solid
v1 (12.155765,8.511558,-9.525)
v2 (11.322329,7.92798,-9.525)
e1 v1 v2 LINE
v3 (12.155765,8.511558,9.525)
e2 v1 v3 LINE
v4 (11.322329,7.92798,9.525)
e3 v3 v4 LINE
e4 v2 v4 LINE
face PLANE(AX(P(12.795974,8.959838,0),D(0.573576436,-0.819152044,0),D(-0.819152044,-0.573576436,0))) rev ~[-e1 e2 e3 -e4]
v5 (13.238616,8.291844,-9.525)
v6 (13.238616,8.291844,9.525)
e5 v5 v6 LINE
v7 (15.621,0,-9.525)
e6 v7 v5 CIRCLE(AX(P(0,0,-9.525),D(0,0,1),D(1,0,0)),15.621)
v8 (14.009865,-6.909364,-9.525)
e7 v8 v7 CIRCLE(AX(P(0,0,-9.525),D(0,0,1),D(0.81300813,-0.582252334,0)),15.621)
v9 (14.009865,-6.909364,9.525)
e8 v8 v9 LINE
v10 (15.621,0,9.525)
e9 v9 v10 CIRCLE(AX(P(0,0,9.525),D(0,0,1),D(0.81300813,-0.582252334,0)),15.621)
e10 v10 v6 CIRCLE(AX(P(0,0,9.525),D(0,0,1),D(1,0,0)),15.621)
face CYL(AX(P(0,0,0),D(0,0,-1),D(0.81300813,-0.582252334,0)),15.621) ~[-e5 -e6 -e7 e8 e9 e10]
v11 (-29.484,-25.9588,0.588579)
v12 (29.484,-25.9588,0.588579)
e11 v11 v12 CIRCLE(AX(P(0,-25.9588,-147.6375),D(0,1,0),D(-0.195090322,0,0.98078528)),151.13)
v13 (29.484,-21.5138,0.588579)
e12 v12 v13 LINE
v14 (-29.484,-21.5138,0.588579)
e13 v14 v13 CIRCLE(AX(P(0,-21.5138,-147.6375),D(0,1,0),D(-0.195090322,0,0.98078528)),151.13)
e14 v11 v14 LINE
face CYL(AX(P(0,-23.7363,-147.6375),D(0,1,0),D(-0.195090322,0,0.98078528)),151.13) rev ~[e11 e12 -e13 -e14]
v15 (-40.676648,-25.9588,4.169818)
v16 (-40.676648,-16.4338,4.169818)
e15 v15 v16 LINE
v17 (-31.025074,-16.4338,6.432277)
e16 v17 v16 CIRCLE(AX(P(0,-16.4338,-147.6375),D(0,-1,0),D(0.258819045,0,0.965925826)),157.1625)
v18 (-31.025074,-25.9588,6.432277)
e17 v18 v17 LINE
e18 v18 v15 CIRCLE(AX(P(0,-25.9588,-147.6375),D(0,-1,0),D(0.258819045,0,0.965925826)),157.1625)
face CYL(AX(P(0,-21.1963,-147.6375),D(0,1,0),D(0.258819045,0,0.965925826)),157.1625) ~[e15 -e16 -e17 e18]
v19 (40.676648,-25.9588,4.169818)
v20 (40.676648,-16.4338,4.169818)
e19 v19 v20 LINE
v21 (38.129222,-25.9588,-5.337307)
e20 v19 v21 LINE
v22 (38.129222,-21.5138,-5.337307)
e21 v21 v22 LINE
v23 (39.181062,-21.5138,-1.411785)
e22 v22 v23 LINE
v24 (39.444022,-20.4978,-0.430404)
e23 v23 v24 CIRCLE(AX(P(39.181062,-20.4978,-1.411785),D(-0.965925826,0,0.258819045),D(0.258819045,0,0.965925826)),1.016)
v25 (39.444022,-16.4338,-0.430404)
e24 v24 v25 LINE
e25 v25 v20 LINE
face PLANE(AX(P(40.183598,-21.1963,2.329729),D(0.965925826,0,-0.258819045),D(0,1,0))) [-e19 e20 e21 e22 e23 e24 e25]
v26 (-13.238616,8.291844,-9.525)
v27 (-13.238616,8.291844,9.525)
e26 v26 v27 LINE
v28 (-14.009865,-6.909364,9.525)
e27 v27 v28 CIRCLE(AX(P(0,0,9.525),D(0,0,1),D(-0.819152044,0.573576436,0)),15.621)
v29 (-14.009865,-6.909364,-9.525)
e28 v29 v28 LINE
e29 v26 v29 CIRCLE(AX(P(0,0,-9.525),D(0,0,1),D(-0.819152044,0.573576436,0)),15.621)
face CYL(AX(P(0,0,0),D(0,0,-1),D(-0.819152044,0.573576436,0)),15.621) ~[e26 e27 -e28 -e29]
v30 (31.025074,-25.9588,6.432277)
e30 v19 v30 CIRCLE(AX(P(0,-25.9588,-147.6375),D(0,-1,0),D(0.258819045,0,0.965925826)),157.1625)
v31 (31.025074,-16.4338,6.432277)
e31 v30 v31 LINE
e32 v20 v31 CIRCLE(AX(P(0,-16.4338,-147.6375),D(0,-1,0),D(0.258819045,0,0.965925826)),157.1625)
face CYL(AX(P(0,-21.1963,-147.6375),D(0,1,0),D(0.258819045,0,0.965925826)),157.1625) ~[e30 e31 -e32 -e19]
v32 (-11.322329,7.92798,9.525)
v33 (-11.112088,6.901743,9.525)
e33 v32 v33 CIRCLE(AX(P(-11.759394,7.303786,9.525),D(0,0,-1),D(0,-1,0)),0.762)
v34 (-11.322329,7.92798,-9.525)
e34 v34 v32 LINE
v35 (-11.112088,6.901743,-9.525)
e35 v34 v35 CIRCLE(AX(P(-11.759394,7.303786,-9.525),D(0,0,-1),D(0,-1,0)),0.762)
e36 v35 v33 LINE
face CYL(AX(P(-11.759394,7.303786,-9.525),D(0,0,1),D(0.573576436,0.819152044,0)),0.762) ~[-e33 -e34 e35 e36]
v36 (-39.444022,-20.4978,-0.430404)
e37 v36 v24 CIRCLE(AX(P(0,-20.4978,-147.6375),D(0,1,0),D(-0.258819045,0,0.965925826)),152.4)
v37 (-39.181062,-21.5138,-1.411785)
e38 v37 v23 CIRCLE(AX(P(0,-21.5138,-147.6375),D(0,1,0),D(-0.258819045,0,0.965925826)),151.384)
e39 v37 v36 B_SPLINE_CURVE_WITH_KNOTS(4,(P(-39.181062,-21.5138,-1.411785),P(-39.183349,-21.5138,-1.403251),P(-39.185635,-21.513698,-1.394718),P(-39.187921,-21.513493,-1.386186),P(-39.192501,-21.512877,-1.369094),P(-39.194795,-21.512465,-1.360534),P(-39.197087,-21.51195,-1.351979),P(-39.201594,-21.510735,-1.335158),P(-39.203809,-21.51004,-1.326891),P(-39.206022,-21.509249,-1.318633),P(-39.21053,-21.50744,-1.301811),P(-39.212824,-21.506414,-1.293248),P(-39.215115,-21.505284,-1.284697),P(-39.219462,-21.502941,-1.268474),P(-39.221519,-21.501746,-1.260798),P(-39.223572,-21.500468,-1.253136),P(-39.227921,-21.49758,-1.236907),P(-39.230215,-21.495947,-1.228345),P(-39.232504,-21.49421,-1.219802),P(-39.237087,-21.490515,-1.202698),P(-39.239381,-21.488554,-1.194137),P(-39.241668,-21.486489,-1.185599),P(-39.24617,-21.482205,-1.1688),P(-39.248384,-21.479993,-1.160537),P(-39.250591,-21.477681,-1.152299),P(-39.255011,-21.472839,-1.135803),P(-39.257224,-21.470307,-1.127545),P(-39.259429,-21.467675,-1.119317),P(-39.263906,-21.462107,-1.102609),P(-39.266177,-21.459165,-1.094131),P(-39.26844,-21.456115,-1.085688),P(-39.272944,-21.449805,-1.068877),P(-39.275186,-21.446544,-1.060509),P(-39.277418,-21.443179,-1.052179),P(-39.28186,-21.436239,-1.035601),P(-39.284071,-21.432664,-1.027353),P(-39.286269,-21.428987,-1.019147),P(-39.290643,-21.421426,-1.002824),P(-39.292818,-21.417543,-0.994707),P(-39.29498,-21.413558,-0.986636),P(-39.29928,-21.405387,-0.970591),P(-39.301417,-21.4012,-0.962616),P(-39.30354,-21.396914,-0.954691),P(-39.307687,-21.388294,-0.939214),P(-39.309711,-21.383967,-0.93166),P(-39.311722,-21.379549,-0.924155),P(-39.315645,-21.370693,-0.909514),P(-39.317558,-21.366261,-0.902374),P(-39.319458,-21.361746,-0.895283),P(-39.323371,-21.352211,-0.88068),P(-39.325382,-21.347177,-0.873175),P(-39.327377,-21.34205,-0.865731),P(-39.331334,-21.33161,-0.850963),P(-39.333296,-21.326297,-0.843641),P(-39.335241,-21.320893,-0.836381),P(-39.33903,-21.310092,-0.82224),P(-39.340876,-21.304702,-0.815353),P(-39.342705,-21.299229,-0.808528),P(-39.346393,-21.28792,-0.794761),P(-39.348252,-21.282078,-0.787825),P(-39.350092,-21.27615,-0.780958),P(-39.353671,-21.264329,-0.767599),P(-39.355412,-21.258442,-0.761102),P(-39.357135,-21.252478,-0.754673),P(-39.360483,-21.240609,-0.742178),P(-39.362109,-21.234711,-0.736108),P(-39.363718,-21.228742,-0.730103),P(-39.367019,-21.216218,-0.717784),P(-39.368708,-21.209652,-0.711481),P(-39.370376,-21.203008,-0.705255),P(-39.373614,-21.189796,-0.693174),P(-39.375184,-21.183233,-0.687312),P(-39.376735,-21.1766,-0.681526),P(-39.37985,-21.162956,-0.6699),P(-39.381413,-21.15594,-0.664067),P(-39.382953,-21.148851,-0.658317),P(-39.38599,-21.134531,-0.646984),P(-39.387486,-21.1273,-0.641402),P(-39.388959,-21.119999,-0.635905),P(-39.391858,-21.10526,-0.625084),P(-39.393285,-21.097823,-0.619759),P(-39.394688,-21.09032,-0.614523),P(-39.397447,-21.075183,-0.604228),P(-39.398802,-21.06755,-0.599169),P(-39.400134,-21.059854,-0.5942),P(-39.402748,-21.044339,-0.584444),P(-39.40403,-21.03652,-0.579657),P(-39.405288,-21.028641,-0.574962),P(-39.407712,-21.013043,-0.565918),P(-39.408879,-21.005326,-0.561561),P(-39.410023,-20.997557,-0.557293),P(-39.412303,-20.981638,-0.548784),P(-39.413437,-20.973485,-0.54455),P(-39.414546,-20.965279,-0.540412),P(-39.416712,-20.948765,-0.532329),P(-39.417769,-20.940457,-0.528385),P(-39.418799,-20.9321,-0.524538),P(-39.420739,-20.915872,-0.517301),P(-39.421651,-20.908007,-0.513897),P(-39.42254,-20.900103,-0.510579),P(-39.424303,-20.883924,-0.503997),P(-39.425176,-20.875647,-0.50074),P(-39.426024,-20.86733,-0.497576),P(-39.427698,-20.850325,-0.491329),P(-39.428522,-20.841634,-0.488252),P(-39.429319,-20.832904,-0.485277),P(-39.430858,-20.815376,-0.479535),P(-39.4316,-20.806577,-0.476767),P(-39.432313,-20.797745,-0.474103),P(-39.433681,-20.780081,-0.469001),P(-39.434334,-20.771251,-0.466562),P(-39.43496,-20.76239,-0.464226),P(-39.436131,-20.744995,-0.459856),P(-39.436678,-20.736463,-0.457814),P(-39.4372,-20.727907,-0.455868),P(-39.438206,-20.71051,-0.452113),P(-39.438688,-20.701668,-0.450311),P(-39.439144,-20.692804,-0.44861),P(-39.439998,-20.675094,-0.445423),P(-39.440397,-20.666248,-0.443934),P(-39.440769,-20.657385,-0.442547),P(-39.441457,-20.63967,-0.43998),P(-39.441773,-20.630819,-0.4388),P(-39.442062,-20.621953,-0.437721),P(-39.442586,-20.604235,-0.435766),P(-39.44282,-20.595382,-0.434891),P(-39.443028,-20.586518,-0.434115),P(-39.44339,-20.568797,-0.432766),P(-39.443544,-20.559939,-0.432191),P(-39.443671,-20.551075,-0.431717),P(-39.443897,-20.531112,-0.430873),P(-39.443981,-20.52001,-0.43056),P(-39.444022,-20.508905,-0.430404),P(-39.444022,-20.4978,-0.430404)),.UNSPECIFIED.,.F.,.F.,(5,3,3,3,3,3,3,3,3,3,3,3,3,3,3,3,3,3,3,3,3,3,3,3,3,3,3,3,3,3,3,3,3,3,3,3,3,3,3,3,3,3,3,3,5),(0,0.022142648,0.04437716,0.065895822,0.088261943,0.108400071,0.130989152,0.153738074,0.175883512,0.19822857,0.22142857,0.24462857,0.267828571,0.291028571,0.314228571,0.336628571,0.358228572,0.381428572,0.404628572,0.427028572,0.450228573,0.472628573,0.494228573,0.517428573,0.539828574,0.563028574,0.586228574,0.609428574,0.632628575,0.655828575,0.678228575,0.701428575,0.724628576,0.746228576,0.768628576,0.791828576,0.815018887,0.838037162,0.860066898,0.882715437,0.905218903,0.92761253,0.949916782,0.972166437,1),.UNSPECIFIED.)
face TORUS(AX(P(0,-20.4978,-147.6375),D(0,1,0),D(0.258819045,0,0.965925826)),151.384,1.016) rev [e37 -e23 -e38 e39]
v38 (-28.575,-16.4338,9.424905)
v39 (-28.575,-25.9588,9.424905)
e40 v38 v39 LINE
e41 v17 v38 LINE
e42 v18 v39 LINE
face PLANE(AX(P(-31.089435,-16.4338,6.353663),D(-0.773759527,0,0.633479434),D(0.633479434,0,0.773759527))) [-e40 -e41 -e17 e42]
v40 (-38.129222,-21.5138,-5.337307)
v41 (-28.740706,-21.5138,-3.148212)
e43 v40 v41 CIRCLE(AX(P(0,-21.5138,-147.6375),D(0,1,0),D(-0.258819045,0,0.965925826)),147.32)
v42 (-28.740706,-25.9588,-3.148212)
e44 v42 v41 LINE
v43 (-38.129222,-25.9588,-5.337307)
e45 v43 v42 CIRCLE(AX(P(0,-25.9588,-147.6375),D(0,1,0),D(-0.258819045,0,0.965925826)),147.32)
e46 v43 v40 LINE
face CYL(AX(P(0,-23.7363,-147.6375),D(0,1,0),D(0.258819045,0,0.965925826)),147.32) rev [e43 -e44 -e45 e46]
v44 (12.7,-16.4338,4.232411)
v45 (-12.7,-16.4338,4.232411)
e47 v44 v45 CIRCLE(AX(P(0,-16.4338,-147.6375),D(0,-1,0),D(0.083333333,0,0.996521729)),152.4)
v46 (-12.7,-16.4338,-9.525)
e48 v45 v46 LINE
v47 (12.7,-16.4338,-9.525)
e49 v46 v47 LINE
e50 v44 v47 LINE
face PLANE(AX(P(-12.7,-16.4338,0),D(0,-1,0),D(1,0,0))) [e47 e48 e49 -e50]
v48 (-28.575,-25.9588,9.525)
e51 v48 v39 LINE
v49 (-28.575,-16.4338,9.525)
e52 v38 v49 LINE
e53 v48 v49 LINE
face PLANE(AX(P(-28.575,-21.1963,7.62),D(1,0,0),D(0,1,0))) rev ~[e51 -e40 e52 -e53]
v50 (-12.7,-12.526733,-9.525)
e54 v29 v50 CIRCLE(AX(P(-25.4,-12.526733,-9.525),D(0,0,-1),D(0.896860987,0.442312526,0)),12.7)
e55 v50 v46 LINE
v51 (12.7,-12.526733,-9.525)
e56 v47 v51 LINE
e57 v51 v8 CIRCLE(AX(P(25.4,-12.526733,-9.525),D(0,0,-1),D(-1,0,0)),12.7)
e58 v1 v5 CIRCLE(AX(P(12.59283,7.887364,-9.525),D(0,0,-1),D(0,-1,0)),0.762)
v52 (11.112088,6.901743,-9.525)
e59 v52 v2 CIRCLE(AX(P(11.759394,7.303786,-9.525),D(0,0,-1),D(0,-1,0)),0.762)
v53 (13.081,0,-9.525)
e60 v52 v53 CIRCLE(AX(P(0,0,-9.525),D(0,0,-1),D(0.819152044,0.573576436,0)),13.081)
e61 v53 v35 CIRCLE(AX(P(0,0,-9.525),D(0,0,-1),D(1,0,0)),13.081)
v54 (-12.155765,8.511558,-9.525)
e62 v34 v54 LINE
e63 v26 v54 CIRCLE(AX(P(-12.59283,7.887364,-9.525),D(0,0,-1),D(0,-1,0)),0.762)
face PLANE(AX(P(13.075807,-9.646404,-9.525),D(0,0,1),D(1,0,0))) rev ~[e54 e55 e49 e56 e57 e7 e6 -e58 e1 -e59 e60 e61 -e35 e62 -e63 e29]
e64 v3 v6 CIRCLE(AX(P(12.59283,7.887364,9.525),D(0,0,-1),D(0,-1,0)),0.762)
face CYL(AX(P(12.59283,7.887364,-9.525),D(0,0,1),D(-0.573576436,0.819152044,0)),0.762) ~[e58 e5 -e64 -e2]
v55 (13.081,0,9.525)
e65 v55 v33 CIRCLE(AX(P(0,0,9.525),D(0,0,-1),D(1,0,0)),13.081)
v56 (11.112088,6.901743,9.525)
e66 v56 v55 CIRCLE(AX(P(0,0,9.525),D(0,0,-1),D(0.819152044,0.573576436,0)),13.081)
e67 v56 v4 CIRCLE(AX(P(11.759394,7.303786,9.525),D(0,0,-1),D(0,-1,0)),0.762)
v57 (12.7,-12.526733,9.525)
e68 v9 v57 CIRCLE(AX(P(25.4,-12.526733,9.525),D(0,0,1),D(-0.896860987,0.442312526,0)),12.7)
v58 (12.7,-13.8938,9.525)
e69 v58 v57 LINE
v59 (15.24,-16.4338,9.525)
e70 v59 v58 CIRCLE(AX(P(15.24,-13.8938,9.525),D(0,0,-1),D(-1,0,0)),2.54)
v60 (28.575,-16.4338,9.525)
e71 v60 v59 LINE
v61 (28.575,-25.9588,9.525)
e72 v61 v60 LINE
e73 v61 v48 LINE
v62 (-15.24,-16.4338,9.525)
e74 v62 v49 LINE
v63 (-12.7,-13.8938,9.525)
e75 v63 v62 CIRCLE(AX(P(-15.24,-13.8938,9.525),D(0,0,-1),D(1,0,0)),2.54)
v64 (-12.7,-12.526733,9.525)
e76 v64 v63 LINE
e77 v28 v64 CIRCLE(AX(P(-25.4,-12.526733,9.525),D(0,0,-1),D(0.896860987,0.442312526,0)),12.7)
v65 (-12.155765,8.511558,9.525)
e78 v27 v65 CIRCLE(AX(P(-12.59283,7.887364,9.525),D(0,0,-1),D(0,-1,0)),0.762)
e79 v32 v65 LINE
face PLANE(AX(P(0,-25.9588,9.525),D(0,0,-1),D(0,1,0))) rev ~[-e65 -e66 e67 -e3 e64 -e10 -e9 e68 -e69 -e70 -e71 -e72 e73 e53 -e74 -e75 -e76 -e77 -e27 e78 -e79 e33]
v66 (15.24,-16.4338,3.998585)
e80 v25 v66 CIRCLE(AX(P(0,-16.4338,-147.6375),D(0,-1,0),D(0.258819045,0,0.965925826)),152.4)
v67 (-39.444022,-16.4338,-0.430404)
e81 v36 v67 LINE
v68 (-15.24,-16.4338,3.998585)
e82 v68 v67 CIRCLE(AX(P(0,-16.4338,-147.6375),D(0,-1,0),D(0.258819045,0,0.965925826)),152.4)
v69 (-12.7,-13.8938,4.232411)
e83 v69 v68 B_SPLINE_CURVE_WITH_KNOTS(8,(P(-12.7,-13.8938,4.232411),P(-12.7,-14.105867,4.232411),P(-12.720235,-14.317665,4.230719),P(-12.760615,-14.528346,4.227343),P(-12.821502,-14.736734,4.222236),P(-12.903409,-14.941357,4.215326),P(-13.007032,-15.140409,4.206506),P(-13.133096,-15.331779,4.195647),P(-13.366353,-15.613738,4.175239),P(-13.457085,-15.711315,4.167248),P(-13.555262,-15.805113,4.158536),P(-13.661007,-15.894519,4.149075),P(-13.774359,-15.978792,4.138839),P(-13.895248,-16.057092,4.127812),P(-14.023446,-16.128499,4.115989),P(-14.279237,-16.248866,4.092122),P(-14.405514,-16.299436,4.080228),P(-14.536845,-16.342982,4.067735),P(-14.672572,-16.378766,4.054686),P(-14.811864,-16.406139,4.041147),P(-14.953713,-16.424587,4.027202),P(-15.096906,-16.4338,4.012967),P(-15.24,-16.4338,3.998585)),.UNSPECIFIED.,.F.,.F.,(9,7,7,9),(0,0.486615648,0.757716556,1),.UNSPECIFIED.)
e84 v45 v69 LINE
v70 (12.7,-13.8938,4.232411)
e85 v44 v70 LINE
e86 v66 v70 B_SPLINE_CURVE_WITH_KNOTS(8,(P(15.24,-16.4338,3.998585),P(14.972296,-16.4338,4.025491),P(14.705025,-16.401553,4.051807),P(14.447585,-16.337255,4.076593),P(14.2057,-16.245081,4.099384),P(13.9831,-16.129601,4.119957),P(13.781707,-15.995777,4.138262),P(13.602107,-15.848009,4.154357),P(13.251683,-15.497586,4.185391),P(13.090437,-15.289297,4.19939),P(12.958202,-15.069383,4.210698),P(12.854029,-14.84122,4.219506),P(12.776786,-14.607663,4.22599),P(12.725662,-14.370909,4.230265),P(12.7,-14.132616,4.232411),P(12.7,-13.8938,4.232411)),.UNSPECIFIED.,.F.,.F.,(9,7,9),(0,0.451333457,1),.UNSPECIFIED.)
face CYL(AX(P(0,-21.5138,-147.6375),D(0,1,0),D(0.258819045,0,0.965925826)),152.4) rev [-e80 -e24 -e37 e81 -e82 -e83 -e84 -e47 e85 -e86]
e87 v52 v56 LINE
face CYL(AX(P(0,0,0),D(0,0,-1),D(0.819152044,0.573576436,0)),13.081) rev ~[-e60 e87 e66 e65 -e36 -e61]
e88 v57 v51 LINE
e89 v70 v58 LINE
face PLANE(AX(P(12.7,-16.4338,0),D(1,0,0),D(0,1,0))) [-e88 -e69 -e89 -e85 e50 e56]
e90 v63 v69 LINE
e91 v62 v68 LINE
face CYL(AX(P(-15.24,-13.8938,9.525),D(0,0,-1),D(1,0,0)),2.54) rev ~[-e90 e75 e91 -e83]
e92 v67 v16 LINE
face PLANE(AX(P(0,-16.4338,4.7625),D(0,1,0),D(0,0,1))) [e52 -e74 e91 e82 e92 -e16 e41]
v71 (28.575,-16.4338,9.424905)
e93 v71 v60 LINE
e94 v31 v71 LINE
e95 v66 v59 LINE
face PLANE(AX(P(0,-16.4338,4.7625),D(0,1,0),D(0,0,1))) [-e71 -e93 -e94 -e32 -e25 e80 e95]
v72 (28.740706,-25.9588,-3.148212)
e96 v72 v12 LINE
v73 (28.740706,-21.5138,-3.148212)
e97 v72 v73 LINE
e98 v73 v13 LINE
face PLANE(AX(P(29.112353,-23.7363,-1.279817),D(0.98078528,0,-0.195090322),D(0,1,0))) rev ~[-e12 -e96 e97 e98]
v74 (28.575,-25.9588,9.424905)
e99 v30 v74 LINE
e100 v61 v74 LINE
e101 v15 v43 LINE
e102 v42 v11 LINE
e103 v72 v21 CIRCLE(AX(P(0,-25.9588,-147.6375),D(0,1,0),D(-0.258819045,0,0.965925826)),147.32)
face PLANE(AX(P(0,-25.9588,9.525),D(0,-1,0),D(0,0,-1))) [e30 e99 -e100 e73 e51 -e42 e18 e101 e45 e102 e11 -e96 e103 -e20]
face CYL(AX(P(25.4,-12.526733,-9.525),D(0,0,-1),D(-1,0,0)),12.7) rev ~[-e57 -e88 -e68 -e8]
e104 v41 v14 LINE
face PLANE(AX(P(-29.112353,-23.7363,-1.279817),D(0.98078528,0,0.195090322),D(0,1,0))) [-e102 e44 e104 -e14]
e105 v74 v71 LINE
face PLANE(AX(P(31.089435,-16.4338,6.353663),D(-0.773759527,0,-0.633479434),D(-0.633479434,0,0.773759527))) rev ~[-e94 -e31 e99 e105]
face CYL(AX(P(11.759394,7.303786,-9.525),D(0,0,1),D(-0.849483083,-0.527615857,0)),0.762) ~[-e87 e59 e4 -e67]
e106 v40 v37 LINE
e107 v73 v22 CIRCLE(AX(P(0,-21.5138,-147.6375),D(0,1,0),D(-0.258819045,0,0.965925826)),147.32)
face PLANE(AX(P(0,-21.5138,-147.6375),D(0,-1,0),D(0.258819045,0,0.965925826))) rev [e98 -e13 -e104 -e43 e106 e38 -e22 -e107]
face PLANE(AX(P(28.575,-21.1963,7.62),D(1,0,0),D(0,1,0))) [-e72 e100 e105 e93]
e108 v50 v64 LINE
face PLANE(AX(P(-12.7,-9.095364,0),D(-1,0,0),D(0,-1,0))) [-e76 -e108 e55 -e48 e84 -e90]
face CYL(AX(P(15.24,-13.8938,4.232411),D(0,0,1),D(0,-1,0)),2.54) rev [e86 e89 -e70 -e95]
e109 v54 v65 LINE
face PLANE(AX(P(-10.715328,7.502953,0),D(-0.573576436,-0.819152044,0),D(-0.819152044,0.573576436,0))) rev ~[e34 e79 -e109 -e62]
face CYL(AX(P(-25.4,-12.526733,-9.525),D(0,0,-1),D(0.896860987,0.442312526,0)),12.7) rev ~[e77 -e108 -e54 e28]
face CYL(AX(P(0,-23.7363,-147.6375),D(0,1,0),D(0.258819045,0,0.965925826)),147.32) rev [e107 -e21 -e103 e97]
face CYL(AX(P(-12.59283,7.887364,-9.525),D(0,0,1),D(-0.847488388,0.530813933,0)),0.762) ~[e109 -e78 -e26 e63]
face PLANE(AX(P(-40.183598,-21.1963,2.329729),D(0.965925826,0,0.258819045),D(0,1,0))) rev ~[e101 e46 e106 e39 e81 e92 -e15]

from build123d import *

# Parameters (mm, degrees)
F1_DEPTH       = 9.525
F2_DEPTH       = 9.525
F3_T1_DEPTH    = 19.05
F3_T3_DEPTH    = 9.525
F3_T5_DEPTH    = 9.525
F4_R           = 0.762
F6_W           = 9.525
F6_H           = 3.81
F6_W_2         = 4.445
F7_ANGLE_BACK  = 15
F7_ANGLE       = 30
F8_R           = 1.016
F9_DEPTH       = 28.575
F10_R          = 2.54
F11_T1_DEPTH   = 9.525
F12_ANGLE_BACK = 11.25
F12_ANGLE      = 22.5


# Not quite as in the source:
# - a fillet or chamfer that OpenCascade refuses, or shapes differently, is made with other operations: its cross-section is extruded or revolved along the edge and cut away or added


with BuildPart() as f1:
    # F0 (on Top) → F1 (new body, symmetric)
    with BuildSketch(Plane.XY):
        with BuildLine():
            ThreePointArc((12.7, -9.0953637091), (14.8728333044, -4.7764495705), (15.621, 0))
            ThreePointArc((15.621, 0), (14.8980124876, 4.6973252941), (12.7959740838, 8.9598375122))
            Line((12.7959740838, 8.9598375122), (10.7153278913, 7.5029533639))
            ThreePointArc((10.7153278913, 7.5029533639), (12.4755714327, 3.9335325633), (13.081, 0))
            ThreePointArc((13.081, 0), (-3.9335325633, -12.4755714327), (-10.7153278913, 7.5029533639))
            Line((-10.7153278913, 7.5029533639), (-12.7959740838, 8.9598375122))
            ThreePointArc((-12.7959740838, 8.9598375122), (-15.6207793149, -0.0830336901), (-12.7, -9.0953637091))
            ThreePointArc((-12.7, -9.0953637091), (0, -15.621), (12.7, -9.0953637091))
        make_face()
    extrude(amount=F1_DEPTH, both=True)

    # F0 (on Top) → F2 (join, symmetric)
    with BuildSketch(Plane.XY):
        with BuildLine():
            Line((12.7, -16.4338), (12.7, -9.0953637091))
            ThreePointArc((12.7, -9.0953637091), (0, -15.621), (-12.7, -9.0953637091))
            Line((-12.7, -9.0953637091), (-12.7, -16.4338))
            Line((-12.7, -16.4338), (12.7, -16.4338))
        make_face()
    extrude(amount=F2_DEPTH, both=True)

    # F3: fillet of radius 12.7 on 3 edges, made by hand

    # F3_s2 → F3_t1 (join)
    with BuildSketch(Plane.XY.offset(-9.525)):
        with BuildLine():
            ThreePointArc((-14.0098654709, -6.9093639714), (-13.0318006864, -9.6427001587), (-12.7, -12.5267330538))
            Line((-12.7, -12.5267330538), (-12.7, -9.0953637091))
            ThreePointArc((-12.7, -9.0953637091), (-13.3995849593, -8.0291197475), (-14.0098654709, -6.9093639714))
        make_face()
    extrude(amount=F3_T1_DEPTH)

    # F3_s4 → F3_t3 (join)
    with BuildSketch(Plane.XY):
        with BuildLine():
            ThreePointArc((14.0098654709, -6.9093639714), (13.0318006864, -9.6427001587), (12.7, -12.5267330538))
            Line((12.7, -12.5267330538), (12.7, -9.0953637091))
            ThreePointArc((12.7, -9.0953637091), (13.3995849593, -8.0291197475), (14.0098654709, -6.9093639714))
        make_face()
    extrude(amount=F3_T3_DEPTH)

    # F3_s6 → F3_t5 (join)
    with BuildSketch(Plane.XY.offset(-9.525)):
        with BuildLine():
            ThreePointArc((12.7, -12.5267330538), (13.0318006864, -9.6427001587), (14.0098654709, -6.9093639714))
            ThreePointArc((14.0098654709, -6.9093639714), (13.3995849593, -8.0291197475), (12.7, -9.0953637091))
            Line((12.7, -9.0953637091), (12.7, -12.5267330538))
        make_face()
    extrude(amount=F3_T5_DEPTH)

    # F4
    f4_edges = [f1.edges().sort_by_distance(p)[0] for p in [
        (-12.795974, 8.959838, 0),
        (-10.715328, 7.502953, -4.7625),
        (-10.715328, 7.502953, 4.7625),
        (12.795974, 8.959838, 4.7625),
        (12.795974, 8.959838, -4.7625),
        (10.715328, 7.502953, 4.7625),
        (10.715328, 7.502953, -4.7625),
    ]]
    fillet(f4_edges, radius=F4_R)

    # F6 (on Right) → F7 (revolve)
    with BuildSketch(Plane.YZ, mode=Mode.PRIVATE) as f7_sk:
        with Locations((-21.1963, 7.62)):
            Rectangle(F6_W, F6_H)
        Polygon((-16.4338, 4.7625), (-16.4338, 5.715), (-25.9588, 5.715), (-25.9588, 3.4925), (-21.5138, 3.4925), (-21.5138, 4.7625), align=None)
        with Locations((-23.7363, 1.5875)):
            Rectangle(F6_W_2, F6_H)
    revolve(f7_sk.sketch.rotate(Axis((0, -16.4338, -147.6375), (0, -1, 0)), -F7_ANGLE_BACK), axis=Axis((0, -16.4338, -147.6375), (0, -1, 0)), revolution_arc=F7_ANGLE)

    # F8
    f8_edges = [f1.edges().sort_by_distance(p)[0] for p in [
        (0, -21.5138, 4.7625),
    ]]
    fillet(f8_edges, radius=F8_R)

    # F6 (on Right) → F9 (join, symmetric)
    with BuildSketch(Plane.YZ):
        with Locations((-21.1963, 7.62)):
            Rectangle(F6_W, F6_H)
        Polygon((-16.4338, 4.7625), (-16.4338, 5.715), (-25.9588, 5.715), (-25.9588, 3.4925), (-21.5138, 3.4925), (-21.5138, 4.7625), align=None)
        with Locations((-23.7363, 1.5875)):
            Rectangle(F6_W_2, F6_H)
    extrude(amount=F9_DEPTH, both=True)

    # F10
    f10_edges = [f1.edges().sort_by_distance(p)[0] for p in [
        (-12.7, -16.4338, 6.878706),
        (12.7, -16.4338, 6.878706),
    ]]
    fillet(f10_edges, radius=F10_R)

    # F11: chamfer of 2.54 on 2 edges, made by hand

    # F11_s2 → F11_t1 (join)
    with BuildSketch(Plane.XZ.offset(16.4338)):
        with BuildLine():
            Line((-31.089435357, 6.3536630782), (-28.5106384895, 9.503518522))
            Line((-28.5106384895, 9.503518522), (-28.4598384895, 9.503518522))
            ThreePointArc((-28.4598384895, 9.503518522), (-28.5242, 8.2044800333), (-28.5242, 6.9054415446))
            Line((-28.5242, 6.9054415446), (-28.5657636364, 6.8554882705))
            ThreePointArc((-28.5657636364, 6.8554882705), (-29.8296810134, 6.6164348202), (-31.0794070503, 6.3038627463))
            Line((-31.0794070503, 6.3038627463), (-31.089435357, 6.3536630782))
        make_face()
        with BuildLine():
            Line((31.089435357, 6.3536630782), (28.5106384895, 9.503518522))
            Line((28.5106384895, 9.503518522), (28.4598384895, 9.503518522))
            ThreePointArc((28.4598384895, 9.503518522), (28.5242, 8.2044800333), (28.5242, 6.9054415446))
            Line((28.5242, 6.9054415446), (28.5657636364, 6.8554882705))
            ThreePointArc((28.5657636364, 6.8554882705), (29.8296810134, 6.6164348202), (31.0794070503, 6.3038627463))
            Line((31.0794070503, 6.3038627463), (31.089435357, 6.3536630782))
        make_face()
    extrude(amount=F11_T1_DEPTH)

    # F6 (on Right) → F12 (revolve, cut)
    with BuildSketch(Plane.YZ, mode=Mode.PRIVATE) as f12_sk:
        with Locations((-23.7363, 1.5875)):
            Rectangle(F6_W_2, F6_H)
    revolve(f12_sk.sketch.rotate(Axis((0, -25.9588, -147.6375), (0, 1, 0)), -F12_ANGLE_BACK), axis=Axis((0, -25.9588, -147.6375), (0, 1, 0)), revolution_arc=F12_ANGLE, mode=Mode.SUBTRACT)


solid = f1.part
